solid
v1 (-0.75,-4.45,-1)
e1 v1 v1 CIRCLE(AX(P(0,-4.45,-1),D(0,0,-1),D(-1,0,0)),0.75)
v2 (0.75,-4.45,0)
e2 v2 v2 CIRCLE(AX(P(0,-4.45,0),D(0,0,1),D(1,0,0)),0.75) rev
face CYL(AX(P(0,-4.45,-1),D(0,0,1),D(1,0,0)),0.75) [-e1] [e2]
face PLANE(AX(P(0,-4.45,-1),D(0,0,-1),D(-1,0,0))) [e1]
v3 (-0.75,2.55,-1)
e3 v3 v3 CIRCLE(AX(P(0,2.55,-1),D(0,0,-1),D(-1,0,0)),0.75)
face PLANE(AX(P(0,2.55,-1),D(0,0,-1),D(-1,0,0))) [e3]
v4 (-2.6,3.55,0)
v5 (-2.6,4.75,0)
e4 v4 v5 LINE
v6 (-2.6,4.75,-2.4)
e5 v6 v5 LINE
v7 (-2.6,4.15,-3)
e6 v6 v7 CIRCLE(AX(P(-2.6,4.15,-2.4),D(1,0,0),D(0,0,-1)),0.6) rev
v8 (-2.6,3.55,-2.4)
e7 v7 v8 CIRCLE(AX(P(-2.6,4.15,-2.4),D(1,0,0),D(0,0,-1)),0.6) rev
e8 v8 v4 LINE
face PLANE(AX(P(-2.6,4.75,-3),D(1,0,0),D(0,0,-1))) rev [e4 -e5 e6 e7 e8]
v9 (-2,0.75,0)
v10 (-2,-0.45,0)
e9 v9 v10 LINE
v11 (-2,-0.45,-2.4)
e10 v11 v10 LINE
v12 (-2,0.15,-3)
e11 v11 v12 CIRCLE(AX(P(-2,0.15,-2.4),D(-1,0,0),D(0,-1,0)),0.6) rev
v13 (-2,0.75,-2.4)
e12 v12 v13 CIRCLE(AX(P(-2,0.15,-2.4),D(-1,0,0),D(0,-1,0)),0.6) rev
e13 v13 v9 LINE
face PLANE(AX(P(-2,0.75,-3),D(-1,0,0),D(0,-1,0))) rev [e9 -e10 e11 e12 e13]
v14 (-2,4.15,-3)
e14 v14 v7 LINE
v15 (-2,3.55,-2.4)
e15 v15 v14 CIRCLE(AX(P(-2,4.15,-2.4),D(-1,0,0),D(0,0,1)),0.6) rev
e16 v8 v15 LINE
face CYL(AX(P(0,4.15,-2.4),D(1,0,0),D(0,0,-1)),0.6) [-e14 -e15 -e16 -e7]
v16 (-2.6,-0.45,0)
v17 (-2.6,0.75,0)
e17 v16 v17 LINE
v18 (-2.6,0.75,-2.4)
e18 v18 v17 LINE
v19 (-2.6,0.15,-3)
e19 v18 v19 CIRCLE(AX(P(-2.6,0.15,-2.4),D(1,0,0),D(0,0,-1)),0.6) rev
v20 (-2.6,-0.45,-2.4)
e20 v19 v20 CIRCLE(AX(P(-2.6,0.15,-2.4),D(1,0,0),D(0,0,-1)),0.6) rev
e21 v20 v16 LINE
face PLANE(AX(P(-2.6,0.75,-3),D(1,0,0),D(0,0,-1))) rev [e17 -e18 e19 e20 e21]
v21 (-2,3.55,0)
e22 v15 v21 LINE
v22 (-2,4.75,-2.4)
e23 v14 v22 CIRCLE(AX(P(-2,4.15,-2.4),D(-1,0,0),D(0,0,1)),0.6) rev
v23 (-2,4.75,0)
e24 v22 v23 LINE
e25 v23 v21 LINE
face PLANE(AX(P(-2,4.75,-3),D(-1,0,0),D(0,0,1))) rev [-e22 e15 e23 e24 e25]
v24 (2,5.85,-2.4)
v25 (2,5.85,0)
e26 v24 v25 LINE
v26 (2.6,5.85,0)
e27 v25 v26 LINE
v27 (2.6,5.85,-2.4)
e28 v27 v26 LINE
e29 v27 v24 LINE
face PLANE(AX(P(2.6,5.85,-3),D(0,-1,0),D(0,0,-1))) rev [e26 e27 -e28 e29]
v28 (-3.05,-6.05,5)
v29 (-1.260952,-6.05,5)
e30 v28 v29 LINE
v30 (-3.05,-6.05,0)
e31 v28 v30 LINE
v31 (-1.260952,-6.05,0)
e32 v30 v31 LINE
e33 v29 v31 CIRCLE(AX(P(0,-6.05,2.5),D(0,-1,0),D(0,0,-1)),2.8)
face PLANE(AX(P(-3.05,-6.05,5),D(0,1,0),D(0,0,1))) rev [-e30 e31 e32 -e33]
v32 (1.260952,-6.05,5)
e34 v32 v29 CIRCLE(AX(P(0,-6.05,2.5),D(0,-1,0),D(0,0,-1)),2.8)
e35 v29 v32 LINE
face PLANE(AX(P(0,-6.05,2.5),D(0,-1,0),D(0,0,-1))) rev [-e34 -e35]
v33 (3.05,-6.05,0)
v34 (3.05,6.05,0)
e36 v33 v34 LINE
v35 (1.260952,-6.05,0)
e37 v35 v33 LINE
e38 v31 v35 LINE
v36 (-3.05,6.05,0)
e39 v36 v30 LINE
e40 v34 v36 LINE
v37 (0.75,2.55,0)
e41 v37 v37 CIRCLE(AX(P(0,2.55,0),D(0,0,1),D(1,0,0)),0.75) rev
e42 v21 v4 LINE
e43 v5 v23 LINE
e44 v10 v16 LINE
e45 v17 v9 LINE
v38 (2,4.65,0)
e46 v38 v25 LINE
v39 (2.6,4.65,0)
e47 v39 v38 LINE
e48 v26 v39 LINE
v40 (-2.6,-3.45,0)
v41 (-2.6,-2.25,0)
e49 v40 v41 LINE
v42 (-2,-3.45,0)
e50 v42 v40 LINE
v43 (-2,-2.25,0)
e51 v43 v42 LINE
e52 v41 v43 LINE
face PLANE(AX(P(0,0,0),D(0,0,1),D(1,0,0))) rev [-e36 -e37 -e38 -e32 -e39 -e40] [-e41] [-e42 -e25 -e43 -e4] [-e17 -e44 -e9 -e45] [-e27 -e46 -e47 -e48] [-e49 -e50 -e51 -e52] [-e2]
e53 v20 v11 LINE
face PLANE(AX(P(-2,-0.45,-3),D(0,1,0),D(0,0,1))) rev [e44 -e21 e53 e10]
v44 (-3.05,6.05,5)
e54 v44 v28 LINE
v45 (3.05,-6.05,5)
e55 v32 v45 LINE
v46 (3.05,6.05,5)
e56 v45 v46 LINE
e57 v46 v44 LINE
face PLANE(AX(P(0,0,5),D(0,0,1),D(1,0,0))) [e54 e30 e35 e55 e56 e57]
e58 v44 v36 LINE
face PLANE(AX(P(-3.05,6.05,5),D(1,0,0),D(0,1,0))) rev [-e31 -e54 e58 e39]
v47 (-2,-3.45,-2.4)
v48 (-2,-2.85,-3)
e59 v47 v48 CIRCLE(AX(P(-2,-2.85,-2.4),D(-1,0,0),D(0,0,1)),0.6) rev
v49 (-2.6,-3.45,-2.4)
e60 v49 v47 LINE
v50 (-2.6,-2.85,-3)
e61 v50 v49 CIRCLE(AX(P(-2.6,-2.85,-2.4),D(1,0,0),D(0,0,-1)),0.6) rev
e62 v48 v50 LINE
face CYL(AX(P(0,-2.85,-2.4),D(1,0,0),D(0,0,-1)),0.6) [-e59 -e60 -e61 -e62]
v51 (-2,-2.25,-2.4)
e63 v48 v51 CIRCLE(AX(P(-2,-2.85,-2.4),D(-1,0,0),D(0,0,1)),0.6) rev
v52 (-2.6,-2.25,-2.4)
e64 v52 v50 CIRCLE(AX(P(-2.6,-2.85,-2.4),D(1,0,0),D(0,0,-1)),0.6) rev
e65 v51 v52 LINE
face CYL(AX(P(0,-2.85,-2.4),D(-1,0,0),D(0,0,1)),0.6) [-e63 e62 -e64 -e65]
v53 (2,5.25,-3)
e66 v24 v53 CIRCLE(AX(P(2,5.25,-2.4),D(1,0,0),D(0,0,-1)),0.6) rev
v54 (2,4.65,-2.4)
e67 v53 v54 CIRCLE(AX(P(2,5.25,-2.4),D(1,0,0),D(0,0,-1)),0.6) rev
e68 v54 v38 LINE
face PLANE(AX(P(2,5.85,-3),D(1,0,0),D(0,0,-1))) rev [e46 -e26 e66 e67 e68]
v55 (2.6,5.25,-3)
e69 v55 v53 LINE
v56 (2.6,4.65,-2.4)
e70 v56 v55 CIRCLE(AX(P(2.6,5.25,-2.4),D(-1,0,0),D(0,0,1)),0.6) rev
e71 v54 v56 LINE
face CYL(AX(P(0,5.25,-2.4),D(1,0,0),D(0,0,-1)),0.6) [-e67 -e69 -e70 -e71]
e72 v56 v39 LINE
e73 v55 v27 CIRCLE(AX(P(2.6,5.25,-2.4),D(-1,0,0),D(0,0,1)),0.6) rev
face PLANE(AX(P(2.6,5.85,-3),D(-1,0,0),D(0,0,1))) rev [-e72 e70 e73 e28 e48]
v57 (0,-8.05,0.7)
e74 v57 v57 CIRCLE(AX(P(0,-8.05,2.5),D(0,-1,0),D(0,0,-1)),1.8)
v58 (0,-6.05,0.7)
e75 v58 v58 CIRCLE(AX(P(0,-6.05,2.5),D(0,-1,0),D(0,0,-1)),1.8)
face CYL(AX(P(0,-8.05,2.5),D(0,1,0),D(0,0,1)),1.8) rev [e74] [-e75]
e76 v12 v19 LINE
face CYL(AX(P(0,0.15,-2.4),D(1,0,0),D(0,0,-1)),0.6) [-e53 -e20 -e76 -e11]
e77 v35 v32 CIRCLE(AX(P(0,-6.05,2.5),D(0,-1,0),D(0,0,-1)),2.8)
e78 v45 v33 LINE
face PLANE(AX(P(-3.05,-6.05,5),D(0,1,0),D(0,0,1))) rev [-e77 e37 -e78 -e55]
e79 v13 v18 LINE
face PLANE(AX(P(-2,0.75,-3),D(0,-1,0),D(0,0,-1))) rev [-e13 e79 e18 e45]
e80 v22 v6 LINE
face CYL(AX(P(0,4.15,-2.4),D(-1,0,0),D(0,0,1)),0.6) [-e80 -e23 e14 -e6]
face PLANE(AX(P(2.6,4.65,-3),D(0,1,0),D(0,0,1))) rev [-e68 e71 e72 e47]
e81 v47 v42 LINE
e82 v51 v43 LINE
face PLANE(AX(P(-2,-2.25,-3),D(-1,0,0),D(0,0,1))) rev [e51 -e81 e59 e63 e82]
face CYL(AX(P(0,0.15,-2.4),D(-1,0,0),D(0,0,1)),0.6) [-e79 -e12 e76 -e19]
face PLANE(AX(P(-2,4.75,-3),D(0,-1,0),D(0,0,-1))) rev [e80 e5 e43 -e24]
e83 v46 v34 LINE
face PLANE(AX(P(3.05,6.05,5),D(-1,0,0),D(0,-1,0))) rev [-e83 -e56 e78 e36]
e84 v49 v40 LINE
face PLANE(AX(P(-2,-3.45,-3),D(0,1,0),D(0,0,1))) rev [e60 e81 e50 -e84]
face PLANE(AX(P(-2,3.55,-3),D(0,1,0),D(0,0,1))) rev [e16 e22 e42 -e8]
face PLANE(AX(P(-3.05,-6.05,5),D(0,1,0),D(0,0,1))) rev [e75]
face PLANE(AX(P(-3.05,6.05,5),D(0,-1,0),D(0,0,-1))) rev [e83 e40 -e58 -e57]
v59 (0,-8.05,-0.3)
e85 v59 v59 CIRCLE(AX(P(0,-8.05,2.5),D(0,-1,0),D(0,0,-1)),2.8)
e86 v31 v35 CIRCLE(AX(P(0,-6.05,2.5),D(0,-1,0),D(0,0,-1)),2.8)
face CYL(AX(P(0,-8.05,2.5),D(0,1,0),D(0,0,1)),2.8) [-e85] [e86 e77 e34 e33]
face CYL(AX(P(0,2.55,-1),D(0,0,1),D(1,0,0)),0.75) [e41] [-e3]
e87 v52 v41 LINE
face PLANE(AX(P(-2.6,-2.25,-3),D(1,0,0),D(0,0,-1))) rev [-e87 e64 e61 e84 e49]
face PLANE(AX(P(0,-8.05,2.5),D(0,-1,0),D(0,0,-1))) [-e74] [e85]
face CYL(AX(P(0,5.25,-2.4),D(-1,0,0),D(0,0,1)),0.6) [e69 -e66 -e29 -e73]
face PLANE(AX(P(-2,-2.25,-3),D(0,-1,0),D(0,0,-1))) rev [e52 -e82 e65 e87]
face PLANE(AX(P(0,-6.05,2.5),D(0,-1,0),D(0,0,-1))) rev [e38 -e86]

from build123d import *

# Parameters (mm, degrees)
SKETCH1_W           = 6.1
SKETCH1_H           = 12.1
BOSS_EXTRUDE1_DEPTH = 5
SKETCH2_R           = 2.8
SKETCH2_R_2         = 1.8
BOSS_EXTRUDE2_DEPTH = 2
SKETCH3_R           = 0.75
BOSS_EXTRUDE3_DEPTH = 1
SKETCH4_W           = 0.6
SKETCH4_H           = 1.2
BOSS_EXTRUDE4_DEPTH = 3
FILLET1_R           = 0.6


with BuildPart() as part:
    # Sketch1 → Boss-Extrude1 (new body)
    with BuildSketch(Plane.XY):
        Rectangle(SKETCH1_W, SKETCH1_H)
    extrude(amount=BOSS_EXTRUDE1_DEPTH)

    # Sketch2 → Boss-Extrude2 (add)
    with BuildSketch(Plane.XZ.offset(6.05)):
        with Locations(Location((0, 2.5, 0), (0, 0, 63.234499423))):
            Circle(SKETCH2_R)
        with Locations(Location((0, 2.5, 0), (0, 0, 270))):
            Circle(SKETCH2_R_2, mode=Mode.SUBTRACT)
    extrude(amount=BOSS_EXTRUDE2_DEPTH)

    # Sketch3 → Boss-Extrude3 (add)
    with BuildSketch(Plane(origin=(0, 0, 0), x_dir=(-1, 0, 0), z_dir=(0, 0, -1))):
        with Locations(Location((0, -4.45, 0), (0, 0, 180))):
            Circle(SKETCH3_R)
        with Locations(Location((0, 2.55, 0), (0, 0, 180))):
            Circle(SKETCH3_R)
    extrude(amount=BOSS_EXTRUDE3_DEPTH)

    # Sketch4 → Boss-Extrude4 (add)
    with BuildSketch(Plane(origin=(0, 0, 0), x_dir=(-1, 0, 0), z_dir=(0, 0, -1))):
        with Locations((2.3, -2.85)):
            Rectangle(SKETCH4_W, SKETCH4_H)
        with Locations((2.3, 0.15)):
            Rectangle(SKETCH4_W, SKETCH4_H)
        with Locations((2.3, 4.15)):
            Rectangle(SKETCH4_W, SKETCH4_H)
        with Locations((-2.3, 5.25)):
            Rectangle(SKETCH4_W, SKETCH4_H)
    extrude(amount=BOSS_EXTRUDE4_DEPTH)

    # Fillet1
    fillet1_edges = [part.edges().sort_by_distance(p)[0] for p in [
        (-2.3, 4.75, -3),
        (2.3, 5.85, -3),
        (2.3, 4.65, -3),
        (-2.3, 3.55, -3),
        (-2.3, 0.75, -3),
        (-2.3, -0.45, -3),
        (-2.3, -2.25, -3),
        (-2.3, -3.45, -3),
    ]]
    fillet(fillet1_edges, radius=FILLET1_R - 0.0001)  # a hair under: the kernel refuses the full size


solid = part.part
